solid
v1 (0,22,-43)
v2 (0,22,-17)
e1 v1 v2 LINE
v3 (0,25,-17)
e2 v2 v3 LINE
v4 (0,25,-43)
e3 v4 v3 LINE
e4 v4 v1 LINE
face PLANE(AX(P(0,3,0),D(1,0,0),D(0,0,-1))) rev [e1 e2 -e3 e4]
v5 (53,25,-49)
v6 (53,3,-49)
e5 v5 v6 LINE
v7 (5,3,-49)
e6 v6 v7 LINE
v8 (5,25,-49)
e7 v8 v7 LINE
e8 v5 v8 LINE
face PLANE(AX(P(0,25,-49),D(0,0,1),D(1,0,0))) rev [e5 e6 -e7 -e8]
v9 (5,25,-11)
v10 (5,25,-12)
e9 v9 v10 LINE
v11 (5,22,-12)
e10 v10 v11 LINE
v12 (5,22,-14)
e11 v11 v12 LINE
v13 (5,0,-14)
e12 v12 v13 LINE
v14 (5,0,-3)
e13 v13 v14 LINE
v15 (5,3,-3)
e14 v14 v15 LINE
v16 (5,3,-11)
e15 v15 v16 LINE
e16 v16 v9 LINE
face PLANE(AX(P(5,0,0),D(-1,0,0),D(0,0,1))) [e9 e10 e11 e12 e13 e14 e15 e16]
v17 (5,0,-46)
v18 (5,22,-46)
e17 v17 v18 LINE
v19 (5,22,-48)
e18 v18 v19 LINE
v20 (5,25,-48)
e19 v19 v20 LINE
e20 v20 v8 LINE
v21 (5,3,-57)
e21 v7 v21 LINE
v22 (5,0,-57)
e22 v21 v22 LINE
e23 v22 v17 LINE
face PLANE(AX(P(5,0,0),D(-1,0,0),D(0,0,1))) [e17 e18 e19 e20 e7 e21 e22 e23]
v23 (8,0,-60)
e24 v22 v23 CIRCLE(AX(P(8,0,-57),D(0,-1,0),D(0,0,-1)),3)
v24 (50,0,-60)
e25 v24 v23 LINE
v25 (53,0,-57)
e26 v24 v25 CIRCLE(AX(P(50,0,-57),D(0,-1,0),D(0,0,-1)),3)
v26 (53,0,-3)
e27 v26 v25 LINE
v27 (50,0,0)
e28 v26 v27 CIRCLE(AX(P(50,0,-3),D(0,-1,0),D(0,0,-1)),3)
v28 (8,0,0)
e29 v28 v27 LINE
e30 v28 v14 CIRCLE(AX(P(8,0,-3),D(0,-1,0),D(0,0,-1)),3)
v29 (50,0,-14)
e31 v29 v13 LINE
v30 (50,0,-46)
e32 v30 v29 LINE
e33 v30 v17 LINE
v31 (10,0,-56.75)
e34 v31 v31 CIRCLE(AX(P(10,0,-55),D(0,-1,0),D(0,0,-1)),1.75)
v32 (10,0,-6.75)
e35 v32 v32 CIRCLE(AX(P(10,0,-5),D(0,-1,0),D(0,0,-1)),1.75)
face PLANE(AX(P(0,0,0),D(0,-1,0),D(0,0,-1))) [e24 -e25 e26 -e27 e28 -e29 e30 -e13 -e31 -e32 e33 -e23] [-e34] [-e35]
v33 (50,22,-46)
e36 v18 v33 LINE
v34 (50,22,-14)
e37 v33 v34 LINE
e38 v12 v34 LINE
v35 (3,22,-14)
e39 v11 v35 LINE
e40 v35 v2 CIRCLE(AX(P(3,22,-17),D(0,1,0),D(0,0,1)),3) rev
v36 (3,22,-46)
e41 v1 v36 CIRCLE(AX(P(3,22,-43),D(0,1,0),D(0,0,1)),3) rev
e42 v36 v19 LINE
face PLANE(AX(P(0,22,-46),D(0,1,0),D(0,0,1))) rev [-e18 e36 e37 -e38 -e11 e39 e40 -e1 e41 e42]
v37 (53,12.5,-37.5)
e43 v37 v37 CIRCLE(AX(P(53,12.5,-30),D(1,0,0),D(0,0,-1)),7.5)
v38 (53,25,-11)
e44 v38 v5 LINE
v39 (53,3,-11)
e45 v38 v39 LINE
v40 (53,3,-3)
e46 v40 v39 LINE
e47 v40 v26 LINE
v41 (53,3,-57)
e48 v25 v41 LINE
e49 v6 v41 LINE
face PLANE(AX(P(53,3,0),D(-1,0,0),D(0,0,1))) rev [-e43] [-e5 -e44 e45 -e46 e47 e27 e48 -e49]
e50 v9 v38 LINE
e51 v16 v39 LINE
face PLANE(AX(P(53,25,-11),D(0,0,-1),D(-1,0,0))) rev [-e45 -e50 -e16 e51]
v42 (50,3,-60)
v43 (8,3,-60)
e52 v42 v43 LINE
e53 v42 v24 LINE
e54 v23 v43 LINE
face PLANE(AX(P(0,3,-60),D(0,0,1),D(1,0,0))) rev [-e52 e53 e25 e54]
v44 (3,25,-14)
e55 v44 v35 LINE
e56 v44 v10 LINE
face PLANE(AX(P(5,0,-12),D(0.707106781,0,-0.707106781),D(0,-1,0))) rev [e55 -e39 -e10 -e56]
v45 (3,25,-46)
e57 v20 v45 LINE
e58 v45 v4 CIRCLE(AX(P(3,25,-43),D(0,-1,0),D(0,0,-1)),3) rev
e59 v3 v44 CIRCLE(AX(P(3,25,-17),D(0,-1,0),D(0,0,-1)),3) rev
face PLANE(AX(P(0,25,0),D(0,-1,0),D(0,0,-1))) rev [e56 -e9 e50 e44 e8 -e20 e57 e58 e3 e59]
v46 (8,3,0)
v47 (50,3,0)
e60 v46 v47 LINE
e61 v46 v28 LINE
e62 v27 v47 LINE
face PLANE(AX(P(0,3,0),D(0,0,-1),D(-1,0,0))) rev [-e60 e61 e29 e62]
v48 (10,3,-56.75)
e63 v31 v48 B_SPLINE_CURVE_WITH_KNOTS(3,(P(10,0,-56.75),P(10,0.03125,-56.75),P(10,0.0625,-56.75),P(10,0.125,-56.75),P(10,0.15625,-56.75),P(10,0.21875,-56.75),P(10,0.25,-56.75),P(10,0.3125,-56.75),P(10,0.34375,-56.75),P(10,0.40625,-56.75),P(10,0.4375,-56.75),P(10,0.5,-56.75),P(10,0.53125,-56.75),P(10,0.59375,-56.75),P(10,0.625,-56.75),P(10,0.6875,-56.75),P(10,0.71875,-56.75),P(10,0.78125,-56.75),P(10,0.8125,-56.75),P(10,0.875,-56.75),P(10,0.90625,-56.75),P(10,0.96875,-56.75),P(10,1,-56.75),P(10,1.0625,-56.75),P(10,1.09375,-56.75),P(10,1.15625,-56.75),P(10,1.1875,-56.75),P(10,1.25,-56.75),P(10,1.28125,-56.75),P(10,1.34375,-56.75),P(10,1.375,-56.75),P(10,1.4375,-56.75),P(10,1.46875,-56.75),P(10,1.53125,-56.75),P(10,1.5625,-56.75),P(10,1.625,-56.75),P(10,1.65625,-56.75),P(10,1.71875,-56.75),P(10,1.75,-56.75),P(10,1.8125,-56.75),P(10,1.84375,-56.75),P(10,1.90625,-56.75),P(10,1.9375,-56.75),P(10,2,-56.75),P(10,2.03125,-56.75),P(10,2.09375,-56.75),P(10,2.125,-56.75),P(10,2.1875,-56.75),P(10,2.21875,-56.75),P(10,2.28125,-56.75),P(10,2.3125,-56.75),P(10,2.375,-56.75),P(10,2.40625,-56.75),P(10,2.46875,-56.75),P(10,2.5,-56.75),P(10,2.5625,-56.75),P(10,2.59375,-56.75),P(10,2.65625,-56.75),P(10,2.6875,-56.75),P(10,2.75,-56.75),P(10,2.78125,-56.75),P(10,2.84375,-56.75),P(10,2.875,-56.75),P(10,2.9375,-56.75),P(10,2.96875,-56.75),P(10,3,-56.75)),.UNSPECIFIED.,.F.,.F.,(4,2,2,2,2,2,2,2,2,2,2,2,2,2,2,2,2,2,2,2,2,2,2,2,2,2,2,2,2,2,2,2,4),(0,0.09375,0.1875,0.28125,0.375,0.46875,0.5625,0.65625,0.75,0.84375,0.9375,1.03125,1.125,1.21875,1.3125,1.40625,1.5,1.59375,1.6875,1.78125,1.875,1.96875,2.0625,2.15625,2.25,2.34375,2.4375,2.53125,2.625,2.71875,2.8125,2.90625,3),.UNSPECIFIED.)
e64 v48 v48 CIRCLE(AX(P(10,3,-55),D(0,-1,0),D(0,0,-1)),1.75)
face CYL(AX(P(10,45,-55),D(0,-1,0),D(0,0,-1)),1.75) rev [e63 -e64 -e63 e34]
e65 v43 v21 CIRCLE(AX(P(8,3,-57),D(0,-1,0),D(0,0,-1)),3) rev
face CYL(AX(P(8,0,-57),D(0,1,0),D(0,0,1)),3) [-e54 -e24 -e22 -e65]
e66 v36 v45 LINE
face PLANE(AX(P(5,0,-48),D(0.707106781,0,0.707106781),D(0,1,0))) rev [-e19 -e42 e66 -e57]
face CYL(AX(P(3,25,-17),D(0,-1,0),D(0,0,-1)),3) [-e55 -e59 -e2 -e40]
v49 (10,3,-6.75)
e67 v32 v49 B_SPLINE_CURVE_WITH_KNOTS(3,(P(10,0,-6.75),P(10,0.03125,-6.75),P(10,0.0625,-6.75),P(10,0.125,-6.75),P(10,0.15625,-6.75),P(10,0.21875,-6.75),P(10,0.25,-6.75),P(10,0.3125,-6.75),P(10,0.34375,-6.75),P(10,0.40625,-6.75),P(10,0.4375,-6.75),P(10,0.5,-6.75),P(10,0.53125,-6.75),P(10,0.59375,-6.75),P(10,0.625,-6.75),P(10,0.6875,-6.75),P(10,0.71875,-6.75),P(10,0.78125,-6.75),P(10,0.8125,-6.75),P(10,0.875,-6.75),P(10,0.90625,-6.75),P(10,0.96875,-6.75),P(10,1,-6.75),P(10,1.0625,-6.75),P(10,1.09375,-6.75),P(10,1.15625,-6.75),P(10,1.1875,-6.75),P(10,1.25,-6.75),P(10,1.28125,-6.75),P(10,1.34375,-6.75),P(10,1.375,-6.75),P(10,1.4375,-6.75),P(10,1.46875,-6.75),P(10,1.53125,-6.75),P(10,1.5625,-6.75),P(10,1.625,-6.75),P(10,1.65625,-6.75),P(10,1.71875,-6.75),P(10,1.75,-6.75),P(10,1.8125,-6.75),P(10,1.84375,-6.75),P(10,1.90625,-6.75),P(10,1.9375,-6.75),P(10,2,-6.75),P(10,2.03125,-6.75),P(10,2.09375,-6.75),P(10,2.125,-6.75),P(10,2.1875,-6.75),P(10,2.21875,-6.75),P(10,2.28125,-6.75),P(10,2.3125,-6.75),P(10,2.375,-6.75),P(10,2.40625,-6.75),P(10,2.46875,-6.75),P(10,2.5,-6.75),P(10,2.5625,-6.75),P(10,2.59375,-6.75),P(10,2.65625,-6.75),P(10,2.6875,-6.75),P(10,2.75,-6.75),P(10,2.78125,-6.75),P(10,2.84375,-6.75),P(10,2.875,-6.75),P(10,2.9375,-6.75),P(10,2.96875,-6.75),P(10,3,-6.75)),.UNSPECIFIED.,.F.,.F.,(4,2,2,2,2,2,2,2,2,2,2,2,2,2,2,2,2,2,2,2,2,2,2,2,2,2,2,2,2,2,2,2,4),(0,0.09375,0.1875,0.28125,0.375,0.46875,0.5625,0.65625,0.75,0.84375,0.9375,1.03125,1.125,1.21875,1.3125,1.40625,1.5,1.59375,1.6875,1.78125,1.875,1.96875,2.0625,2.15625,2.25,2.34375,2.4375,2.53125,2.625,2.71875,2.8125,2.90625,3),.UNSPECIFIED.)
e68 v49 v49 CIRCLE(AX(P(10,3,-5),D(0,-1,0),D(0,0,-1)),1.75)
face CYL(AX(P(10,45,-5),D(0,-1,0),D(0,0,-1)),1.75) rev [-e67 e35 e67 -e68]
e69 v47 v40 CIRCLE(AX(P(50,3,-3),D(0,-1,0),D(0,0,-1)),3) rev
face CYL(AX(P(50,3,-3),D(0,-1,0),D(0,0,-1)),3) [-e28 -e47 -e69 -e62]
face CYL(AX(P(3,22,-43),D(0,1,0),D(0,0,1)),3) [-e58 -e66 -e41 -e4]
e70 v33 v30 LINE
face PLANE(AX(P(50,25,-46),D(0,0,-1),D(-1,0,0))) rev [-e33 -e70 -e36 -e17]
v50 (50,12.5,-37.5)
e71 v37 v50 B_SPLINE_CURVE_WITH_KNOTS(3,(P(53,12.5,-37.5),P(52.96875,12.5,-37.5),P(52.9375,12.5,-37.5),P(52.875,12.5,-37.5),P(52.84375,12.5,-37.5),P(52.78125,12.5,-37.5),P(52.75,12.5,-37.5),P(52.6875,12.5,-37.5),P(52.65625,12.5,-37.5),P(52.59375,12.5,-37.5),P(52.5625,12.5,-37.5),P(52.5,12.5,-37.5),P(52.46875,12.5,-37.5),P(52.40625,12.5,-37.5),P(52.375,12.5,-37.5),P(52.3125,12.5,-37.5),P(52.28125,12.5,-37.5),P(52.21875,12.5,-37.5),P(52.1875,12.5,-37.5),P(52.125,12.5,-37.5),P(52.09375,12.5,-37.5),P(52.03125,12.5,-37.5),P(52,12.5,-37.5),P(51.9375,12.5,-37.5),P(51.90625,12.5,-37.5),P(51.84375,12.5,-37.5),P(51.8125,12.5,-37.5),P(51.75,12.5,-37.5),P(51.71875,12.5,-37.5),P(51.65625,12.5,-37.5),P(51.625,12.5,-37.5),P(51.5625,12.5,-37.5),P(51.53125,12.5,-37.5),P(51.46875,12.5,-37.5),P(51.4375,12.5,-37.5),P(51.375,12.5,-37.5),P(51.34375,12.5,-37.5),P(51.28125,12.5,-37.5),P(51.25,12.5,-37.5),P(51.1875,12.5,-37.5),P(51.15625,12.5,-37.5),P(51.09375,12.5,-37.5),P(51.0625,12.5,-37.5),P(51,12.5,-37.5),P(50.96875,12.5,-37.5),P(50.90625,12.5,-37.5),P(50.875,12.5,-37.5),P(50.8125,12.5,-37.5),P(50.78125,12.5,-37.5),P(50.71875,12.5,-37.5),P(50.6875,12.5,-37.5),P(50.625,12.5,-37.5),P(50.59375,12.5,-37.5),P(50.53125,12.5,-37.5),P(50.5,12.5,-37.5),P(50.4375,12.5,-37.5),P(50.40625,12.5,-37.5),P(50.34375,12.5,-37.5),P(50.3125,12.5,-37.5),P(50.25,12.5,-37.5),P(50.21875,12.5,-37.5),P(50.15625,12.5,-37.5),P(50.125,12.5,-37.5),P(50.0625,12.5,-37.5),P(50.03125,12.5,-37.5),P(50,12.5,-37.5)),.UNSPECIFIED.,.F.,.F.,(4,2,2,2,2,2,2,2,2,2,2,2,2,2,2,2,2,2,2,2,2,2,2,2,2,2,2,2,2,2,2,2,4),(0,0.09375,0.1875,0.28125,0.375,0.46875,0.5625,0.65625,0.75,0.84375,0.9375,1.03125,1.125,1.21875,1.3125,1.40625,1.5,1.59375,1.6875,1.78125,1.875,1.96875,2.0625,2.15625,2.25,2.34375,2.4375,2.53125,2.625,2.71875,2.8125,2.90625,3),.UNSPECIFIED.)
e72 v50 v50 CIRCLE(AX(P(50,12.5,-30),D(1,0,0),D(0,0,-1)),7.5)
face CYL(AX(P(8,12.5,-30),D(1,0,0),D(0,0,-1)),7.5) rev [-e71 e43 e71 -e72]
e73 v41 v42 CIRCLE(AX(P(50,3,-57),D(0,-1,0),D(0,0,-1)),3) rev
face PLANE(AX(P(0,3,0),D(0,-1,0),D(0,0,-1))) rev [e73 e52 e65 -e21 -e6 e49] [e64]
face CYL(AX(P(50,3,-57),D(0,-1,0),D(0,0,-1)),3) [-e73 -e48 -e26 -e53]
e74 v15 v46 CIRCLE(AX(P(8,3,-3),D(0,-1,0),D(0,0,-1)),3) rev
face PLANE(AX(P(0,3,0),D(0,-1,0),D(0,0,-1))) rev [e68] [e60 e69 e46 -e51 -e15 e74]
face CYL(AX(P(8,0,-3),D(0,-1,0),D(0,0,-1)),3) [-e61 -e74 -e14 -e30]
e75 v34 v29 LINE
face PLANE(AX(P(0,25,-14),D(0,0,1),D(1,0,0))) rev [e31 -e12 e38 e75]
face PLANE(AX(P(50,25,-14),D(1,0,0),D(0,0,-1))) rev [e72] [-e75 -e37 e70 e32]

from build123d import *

# Parameters (mm, degrees)
SKETCH_1_W          = 53
SKETCH_1_H          = 60
EXTRUDE_1_DEPTH     = 3
EXTRUDE_2_DEPTH     = 22
SKETCH_3_W          = 32
SKETCH_3_H          = 3
EXTRUDE_3_DEPTH     = 50
CUT_EXTRUDE_1_DEPTH = 5
SKETCH_6_W          = 32
SKETCH_6_H          = 3
CUT_EXTRUDE_2_DEPTH = 45
SKETCH_7_R          = 7.5
CUT_EXTRUDE_3_DEPTH = 45
SKETCH_8_R          = 1.75
CUT_EXTRUDE_4_DEPTH = 45
FILLET_1_R          = 3
CHAMFER_1_SIZE      = 2


with BuildPart() as part:
    # 草图1 → 凸台-拉伸1 (new body)
    with BuildSketch(Plane(origin=(0, 0, 0), x_dir=(1, 0, 0), z_dir=(0, 1, 0))):
        with Locations((26.5, 30)):
            Rectangle(SKETCH_1_W, SKETCH_1_H)
    extrude(amount=EXTRUDE_1_DEPTH)

    # 草图2 → 凸台-拉伸2 (add)
    with BuildSketch(Plane(origin=(0, 3, 0), x_dir=(1, 0, 0), z_dir=(0, 1, 0))):
        Polygon((0, 49), (53, 49), (53, 11), (0, 11), (0, 14), (50, 14), (50, 46), (0, 46), align=None)
    extrude(amount=EXTRUDE_2_DEPTH)

    # 草图3 → 凸台-拉伸3 (add)
    with BuildSketch(Plane.ZY.offset(-50)):
        with Locations((-30, 23.5)):
            Rectangle(SKETCH_3_W, SKETCH_3_H)
    extrude(amount=EXTRUDE_3_DEPTH)

    # 草图5 → 切除-拉伸1 (cut)
    with BuildSketch(Plane.ZY):
        Polygon((-49, 25), (-49, 3), (-60, 3), (-60, 0), (0, 0), (0, 3), (-11, 3), (-11, 25), (-14, 25), (-14, 22), (-46, 22), (-46, 25), align=None)
    extrude(amount=-CUT_EXTRUDE_1_DEPTH, mode=Mode.SUBTRACT)

    # 草图6 → 切除-拉伸2 (cut)
    with BuildSketch(Plane.ZY.offset(-5)):
        with Locations((-30, 1.5)):
            Rectangle(SKETCH_6_W, SKETCH_6_H)
    extrude(amount=-CUT_EXTRUDE_2_DEPTH, mode=Mode.SUBTRACT)

    # 草图7 → 切除-拉伸3 (cut)
    with BuildSketch(Plane(origin=(53, 0, 0), x_dir=(0, 0, -1), z_dir=(1, 0, 0))):
        with Locations((30, 12.5)):
            Circle(SKETCH_7_R)
    extrude(amount=-CUT_EXTRUDE_3_DEPTH, mode=Mode.SUBTRACT)

    # 草图8 → 切除-拉伸4 (cut)
    with BuildSketch(Plane.XZ):
        with Locations(Location((10, -5, 0), (0, 0, 270))):
            Circle(SKETCH_8_R)
        with Locations(Location((10, -55, 0), (0, 0, 270))):
            Circle(SKETCH_8_R)
    extrude(amount=-CUT_EXTRUDE_4_DEPTH, mode=Mode.SUBTRACT)

    # 圆角1
    fillet_1_edges = [part.edges().sort_by_distance(p)[0] for p in [
        (0, 23.5, -46),
        (0, 23.5, -14),
        (5, 1.5, 0),
        (5, 1.5, -60),
        (53, 1.5, -60),
        (53, 1.5, 0),
    ]]
    fillet(fillet_1_edges, radius=FILLET_1_R)

    # 倒角1
    chamfer_1_edges = [part.edges().sort_by_distance(p)[0] for p in [
        (5, 23.5, -46),
        (5, 23.5, -14),
    ]]
    chamfer(chamfer_1_edges, length=CHAMFER_1_SIZE - 0.0001)  # a hair under: the kernel refuses the full size


solid = part.part
